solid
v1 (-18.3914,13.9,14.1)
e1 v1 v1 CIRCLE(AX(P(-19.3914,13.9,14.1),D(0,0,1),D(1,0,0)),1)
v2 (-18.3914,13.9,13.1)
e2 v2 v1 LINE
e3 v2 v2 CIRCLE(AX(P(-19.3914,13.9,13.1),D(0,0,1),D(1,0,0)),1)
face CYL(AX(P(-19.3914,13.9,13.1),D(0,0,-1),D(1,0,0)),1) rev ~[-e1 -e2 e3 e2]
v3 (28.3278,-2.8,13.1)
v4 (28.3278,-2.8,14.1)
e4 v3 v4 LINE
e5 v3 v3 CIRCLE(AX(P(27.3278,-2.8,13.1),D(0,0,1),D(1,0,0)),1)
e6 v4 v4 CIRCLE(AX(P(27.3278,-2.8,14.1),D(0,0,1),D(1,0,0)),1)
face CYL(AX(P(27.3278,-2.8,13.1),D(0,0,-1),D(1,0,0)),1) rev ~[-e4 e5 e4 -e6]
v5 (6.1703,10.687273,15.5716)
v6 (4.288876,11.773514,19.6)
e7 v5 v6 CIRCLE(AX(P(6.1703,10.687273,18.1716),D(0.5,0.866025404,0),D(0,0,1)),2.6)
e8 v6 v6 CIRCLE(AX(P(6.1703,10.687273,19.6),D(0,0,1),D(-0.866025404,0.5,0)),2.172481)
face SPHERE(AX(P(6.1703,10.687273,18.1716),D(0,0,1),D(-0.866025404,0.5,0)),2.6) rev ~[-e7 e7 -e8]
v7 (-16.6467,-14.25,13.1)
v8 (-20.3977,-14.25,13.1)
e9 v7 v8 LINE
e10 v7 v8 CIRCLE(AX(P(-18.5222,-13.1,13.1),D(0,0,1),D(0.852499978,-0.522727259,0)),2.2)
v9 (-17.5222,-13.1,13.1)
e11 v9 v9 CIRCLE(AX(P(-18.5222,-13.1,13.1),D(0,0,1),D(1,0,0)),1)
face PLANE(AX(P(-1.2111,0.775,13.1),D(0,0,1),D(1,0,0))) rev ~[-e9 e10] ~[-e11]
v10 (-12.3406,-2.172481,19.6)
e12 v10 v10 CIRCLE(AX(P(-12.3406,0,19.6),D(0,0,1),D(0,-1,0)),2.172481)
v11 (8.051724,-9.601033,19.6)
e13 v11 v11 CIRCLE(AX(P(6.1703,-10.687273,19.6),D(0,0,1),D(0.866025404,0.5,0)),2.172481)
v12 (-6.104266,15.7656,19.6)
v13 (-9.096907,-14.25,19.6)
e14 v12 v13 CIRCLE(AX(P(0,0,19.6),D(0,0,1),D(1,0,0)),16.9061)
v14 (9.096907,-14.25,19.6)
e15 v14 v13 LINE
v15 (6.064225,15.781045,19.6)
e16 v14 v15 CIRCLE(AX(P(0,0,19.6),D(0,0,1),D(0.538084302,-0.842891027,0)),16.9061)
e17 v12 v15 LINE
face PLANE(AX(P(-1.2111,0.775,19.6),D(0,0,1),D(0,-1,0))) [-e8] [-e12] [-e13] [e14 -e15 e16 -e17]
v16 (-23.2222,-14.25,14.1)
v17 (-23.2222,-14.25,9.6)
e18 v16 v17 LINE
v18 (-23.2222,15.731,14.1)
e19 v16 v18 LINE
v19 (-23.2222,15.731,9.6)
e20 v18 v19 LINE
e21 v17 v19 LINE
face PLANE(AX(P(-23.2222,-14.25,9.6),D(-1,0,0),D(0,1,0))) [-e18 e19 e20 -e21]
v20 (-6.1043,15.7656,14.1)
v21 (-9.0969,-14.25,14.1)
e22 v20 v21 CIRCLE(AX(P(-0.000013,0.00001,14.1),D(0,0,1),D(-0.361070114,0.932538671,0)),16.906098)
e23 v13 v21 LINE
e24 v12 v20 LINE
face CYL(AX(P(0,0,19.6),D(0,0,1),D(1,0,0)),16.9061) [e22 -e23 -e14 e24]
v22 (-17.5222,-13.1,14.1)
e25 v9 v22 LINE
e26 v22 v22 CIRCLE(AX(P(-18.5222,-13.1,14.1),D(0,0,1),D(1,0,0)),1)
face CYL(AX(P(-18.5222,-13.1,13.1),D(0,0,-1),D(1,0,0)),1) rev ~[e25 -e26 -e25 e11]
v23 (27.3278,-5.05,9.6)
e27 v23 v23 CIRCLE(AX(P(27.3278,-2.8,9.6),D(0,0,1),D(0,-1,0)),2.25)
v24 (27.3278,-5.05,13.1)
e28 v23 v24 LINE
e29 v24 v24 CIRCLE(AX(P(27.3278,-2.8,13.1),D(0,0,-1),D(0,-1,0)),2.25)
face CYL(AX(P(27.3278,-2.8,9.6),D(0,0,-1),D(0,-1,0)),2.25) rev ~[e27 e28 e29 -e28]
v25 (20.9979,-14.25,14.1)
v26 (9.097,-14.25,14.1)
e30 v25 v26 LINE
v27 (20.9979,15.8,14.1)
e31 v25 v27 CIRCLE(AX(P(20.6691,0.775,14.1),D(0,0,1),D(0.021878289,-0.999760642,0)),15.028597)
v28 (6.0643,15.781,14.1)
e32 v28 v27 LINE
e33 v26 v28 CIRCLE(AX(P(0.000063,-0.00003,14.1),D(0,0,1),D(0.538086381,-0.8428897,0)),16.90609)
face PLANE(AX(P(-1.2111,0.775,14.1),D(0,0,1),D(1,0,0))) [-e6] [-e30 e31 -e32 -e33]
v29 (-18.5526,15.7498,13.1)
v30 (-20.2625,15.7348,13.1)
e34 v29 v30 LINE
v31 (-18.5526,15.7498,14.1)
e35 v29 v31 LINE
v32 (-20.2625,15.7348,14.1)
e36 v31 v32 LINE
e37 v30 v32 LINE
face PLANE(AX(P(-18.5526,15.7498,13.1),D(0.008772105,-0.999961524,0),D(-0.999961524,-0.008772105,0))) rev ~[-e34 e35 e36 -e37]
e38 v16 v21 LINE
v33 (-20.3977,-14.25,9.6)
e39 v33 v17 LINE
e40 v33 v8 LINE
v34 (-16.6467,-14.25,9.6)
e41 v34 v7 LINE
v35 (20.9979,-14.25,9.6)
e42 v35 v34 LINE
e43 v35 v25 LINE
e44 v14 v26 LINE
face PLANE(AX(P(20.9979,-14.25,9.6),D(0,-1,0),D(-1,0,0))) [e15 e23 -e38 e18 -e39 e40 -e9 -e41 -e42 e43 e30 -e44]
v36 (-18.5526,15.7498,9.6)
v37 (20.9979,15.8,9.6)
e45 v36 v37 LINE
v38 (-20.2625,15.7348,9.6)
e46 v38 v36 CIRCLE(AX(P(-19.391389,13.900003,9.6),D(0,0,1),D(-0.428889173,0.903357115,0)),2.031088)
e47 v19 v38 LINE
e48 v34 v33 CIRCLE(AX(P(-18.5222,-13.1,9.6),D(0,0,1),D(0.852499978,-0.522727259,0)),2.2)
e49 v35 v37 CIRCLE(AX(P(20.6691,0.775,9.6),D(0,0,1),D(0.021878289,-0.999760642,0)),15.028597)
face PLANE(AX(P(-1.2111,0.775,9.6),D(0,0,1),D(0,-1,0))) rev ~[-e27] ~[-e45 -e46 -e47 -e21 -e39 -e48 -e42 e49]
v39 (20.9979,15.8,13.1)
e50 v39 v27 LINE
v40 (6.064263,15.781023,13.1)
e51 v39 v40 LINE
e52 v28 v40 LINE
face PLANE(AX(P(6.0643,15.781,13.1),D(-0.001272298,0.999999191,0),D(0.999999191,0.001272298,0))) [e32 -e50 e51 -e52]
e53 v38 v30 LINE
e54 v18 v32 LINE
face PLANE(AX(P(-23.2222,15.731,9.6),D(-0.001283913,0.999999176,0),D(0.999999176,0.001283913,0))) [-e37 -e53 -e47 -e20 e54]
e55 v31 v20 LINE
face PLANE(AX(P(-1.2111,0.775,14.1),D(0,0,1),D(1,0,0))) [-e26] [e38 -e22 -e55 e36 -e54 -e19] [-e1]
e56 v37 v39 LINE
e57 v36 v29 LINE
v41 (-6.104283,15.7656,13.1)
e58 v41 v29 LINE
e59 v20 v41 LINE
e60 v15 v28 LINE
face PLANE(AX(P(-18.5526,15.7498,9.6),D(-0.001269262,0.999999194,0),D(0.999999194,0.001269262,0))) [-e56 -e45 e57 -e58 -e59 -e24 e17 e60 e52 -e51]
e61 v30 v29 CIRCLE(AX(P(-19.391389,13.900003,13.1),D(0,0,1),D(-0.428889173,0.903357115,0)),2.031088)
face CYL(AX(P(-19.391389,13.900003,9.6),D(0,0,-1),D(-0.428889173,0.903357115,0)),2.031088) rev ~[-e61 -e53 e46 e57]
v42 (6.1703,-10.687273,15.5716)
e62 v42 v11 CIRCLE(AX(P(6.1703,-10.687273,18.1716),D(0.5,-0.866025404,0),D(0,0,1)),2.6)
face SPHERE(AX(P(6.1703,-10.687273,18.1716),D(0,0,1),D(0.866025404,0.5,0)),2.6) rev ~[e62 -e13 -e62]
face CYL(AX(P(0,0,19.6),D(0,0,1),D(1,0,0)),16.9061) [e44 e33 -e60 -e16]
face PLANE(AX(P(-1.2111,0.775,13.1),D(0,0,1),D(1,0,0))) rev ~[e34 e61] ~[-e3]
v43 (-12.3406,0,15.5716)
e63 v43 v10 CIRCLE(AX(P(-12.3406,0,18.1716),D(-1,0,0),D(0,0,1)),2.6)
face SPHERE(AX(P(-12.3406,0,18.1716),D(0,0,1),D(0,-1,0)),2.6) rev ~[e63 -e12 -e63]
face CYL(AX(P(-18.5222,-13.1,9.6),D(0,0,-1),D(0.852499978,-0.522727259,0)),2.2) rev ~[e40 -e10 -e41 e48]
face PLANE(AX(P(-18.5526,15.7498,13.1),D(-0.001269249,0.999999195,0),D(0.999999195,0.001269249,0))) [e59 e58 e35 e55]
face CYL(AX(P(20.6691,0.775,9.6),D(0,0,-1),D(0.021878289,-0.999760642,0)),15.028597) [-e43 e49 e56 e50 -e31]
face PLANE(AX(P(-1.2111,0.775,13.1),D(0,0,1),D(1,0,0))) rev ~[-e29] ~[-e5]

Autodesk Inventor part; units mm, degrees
ref_plane "YZ Plane" through (0, 0, 0) normal (1, 0, 0) x (0, 1, 0)
ref_plane "Work Plane1" through (-1.2111, 0.775, 9.6) normal (0, 0, 1) x (0, -1, 0)
sketch "Sketch1" plane through (-1.2111, 0.775, 9.6) normal (0, 0, 1) x (0, -1, 0)
  circle A0 centre (3.575, 28.5389) radius 1.75 construction
  circle A1 centre (-13.125, -18.1803) radius 2 construction
  arc A2 (15.225, -15.8355) -> (15.225, -18.7868) centre (13.875, -17.3111) ccw construction
  line L0 (15.225, -15.8355) -> (15.225, 22.2111) construction
  arc A3 (15.225, 22.2111) -> (-15.225, 22.2111) centre (0, 21.8802) ccw construction
  line L1 (-15.225, 22.2111) -> (-15.225, -22.2111) construction
  line L2 (-15.225, -22.2111) -> (15.225, -22.2111) construction
  line L3 (15.225, -22.2111) -> (15.225, -18.7868) construction
  arc A4 (15.025, 22.209) -> (-15.025, 22.209) centre (0, 21.8802) ccw
  line L4 (15.025, 22.209) -> (15.025, -15.4356)
  arc A5 (15.025, -15.4356) -> (15.025, -19.1866) centre (13.875, -17.3111) ccw
  line L5 (15.025, -19.1866) -> (15.025, -22.0111)
  line L6 (15.025, -22.0111) -> (-14.956, -22.0111)
  arc A6 (-15.025, -18.8048) -> (-15.025, -17.5558) centre (-13.125, -18.1803) ccw construction
  circle A7 centre (3.575, 28.5389) radius 2.25
  arc A8 (-14.9598, -19.0514) -> (-14.9748, -17.3415) centre (-13.125, -18.1803) ccw
  line L7 (-14.956, -22.0111) -> (-14.9598, -19.0514)
  line L8 (-14.9748, -17.3415) -> (-15.025, 22.209)
  point P0 (0.775, 1.2111)
  dimension "d0" = 0.2
  dimension "d1" = 0.5
ref_plane "Work Plane2" through (21, -90, 18.7376) normal (0, 0, 1) x (1, 0, 0)
extrude "Extrusion1" add sketch "Sketch1" along normal blind 10
sketch "Sketch2" plane through (-16.6468, -14.25, 19.6) normal (0, 0, 1) x (1, 0, 0)
  circle A0 centre (16.6468, 14.25) radius 12.3406
  line L0 (4.3062, 14.25) -> (22.8171, 24.9373)
  line L1 (22.8171, 24.9373) -> (22.8171, 3.5627)
  line L2 (22.8171, 3.5627) -> (4.3062, 14.25)
ref_plane "Work Plane3" through (-12.3406, 0, 19.6) normal (-1, 0, 0) x (0, 0, 1)
sketch "Sketch3" plane through (-12.3406, 0, 19.6) normal (-1, 0, 0) x (0, 0, 1)
  line L0 (-0.8319, 0) -> (-10, 0)
  line L1 (-10, 15.8) -> (-10, -14.25) projected
  circle A0 centre (-1.4284, 0) radius 2.6
  line L2 (1.1716, 0) -> (-4.0284, 0)
  point P0 (-19.6, 0)
  dimension "d4" = 5.2
revolve "Revolution1" cut sketch "Sketch3" angle 360 about axis through (-12.3406, 0, 18.7681) along (0, 0, -1) picked at (-2.9377, -0.2074) contours L2 A0 L0
pattern_circular "Circular Pattern1" count 3 over 360 about axis through (0, 0, 19.6) along (0, 0, 1) of "Revolution1"
ref_plane "Work Plane4" through (25.5777, -4.55, 13.1) normal (0, 0, 1) x (1, 0, 0)
sketch "Sketch5" plane through (-1.2111, 0.775, 19.6) normal (0, 0, 1) x (1, 0, 0)
  circle A0 centre (1.2111, -0.775) radius 16.9061
  circle A1 centre (7.3815, 9.9123) radius 2.1725 projected
  circle A2 centre (7.3815, -11.4623) radius 2.1725 projected
  circle A3 centre (-11.1295, -0.775) radius 2.1725 projected
  circle A4 centre (28.5389, -3.575) radius 2.25 projected
  arc A5 (22.209, -15.025) -> (22.209, 15.025) centre (21.8802, 0) ccw projected
  line L0 (22.209, 15.025) -> (-17.3415, 14.9748) projected
  arc A6 (-19.0514, 14.9598) -> (-17.3415, 14.9748) centre (-18.1803, 13.125) ccw projected
  line L1 (-19.0514, 14.9598) -> (-22.0111, 14.956) projected
  line L2 (-22.0111, 14.956) -> (-22.0111, -15.025) projected
  line L3 (-22.0111, -15.025) -> (-19.1866, -15.025) projected
  arc A7 (-15.4356, -15.025) -> (-19.1866, -15.025) centre (-17.3111, -13.875) ccw projected
  line L4 (-15.4356, -15.025) -> (22.209, -15.025) projected
  line L5 (22.209, 15.025) -> (-17.3415, 14.9748) projected
  line L6 (-15.4356, -15.025) -> (22.209, -15.025) projected
  point P0 (7.2754, 15.006)
  point P1 (-4.8932, 14.9906)
  point P2 (-7.8858, -15.025)
  point P3 (10.3081, -15.025)
extrude "Extrusion3" cut sketch "Sketch5" against normal up to surface (6.5 mm away) contours A0 L0 A5 L4 | A0 L4 A7 L3 L2 L1 A6 L0
sketch "Sketch6" plane through (-1.2111, 0.775, 13.1) normal (0, 0, 1) x (1, 0, 0)
  circle A0 centre (28.5389, -3.575) radius 2.25 projected
  arc A1 (22.209, -15.025) -> (22.209, 15.025) centre (21.8802, 0) ccw projected
  line L0 (7.2754, 15.006) -> (22.209, 15.025) projected
  arc A2 (10.3081, -15.025) -> (7.2754, 15.006) centre (1.2111, -0.775) ccw projected
  line L1 (22.209, -15.025) -> (10.3081, -15.025) projected
  arc A3 (-19.0514, 14.9598) -> (-17.3415, 14.9748) centre (-18.1803, 13.125) ccw projected
  line L2 (-22.0111, 14.956) -> (-19.0514, 14.9598) projected
  line L3 (-22.0111, -15.025) -> (-22.0111, 14.956) projected
  line L4 (-19.1866, -15.025) -> (-22.0111, -15.025) projected
  arc A4 (-15.4356, -15.025) -> (-19.1866, -15.025) centre (-17.3111, -13.875) ccw projected
  line L5 (-7.8858, -15.025) -> (-15.4356, -15.025) projected
  arc A5 (-4.8932, 14.9906) -> (-7.8858, -15.025) centre (1.2111, -0.775) ccw projected
  line L6 (-17.3415, 14.9748) -> (-4.8932, 14.9906) projected
  circle A6 centre (-18.1803, 13.125) radius 1
  circle A7 centre (-17.3111, -13.875) radius 1
  circle A8 centre (28.5389, -3.575) radius 1
  arc A9 (-19.0514, 14.9598) -> (-17.3415, 14.9748) centre (-18.1803, 13.125) ccw projected
  line L7 (-17.3415, 14.9748) -> (-19.0514, 14.9598)
  line L8 (-15.4356, -15.025) -> (-19.1866, -15.025)
  point P0 (1.2111, -0.775)
  dimension "d13" = 2
  dimension "d14" = 2
  dimension "d15" = 2
extrude "Extrusion4" add sketch "Sketch6" along normal blind 1 contours A0 | L1 A2 L0 A1 | L7 A3 | A3 L6 A5 L5 A4 L4 L3 L2 | A4 L8
properties part number "03_Insert_Chip_solid"
